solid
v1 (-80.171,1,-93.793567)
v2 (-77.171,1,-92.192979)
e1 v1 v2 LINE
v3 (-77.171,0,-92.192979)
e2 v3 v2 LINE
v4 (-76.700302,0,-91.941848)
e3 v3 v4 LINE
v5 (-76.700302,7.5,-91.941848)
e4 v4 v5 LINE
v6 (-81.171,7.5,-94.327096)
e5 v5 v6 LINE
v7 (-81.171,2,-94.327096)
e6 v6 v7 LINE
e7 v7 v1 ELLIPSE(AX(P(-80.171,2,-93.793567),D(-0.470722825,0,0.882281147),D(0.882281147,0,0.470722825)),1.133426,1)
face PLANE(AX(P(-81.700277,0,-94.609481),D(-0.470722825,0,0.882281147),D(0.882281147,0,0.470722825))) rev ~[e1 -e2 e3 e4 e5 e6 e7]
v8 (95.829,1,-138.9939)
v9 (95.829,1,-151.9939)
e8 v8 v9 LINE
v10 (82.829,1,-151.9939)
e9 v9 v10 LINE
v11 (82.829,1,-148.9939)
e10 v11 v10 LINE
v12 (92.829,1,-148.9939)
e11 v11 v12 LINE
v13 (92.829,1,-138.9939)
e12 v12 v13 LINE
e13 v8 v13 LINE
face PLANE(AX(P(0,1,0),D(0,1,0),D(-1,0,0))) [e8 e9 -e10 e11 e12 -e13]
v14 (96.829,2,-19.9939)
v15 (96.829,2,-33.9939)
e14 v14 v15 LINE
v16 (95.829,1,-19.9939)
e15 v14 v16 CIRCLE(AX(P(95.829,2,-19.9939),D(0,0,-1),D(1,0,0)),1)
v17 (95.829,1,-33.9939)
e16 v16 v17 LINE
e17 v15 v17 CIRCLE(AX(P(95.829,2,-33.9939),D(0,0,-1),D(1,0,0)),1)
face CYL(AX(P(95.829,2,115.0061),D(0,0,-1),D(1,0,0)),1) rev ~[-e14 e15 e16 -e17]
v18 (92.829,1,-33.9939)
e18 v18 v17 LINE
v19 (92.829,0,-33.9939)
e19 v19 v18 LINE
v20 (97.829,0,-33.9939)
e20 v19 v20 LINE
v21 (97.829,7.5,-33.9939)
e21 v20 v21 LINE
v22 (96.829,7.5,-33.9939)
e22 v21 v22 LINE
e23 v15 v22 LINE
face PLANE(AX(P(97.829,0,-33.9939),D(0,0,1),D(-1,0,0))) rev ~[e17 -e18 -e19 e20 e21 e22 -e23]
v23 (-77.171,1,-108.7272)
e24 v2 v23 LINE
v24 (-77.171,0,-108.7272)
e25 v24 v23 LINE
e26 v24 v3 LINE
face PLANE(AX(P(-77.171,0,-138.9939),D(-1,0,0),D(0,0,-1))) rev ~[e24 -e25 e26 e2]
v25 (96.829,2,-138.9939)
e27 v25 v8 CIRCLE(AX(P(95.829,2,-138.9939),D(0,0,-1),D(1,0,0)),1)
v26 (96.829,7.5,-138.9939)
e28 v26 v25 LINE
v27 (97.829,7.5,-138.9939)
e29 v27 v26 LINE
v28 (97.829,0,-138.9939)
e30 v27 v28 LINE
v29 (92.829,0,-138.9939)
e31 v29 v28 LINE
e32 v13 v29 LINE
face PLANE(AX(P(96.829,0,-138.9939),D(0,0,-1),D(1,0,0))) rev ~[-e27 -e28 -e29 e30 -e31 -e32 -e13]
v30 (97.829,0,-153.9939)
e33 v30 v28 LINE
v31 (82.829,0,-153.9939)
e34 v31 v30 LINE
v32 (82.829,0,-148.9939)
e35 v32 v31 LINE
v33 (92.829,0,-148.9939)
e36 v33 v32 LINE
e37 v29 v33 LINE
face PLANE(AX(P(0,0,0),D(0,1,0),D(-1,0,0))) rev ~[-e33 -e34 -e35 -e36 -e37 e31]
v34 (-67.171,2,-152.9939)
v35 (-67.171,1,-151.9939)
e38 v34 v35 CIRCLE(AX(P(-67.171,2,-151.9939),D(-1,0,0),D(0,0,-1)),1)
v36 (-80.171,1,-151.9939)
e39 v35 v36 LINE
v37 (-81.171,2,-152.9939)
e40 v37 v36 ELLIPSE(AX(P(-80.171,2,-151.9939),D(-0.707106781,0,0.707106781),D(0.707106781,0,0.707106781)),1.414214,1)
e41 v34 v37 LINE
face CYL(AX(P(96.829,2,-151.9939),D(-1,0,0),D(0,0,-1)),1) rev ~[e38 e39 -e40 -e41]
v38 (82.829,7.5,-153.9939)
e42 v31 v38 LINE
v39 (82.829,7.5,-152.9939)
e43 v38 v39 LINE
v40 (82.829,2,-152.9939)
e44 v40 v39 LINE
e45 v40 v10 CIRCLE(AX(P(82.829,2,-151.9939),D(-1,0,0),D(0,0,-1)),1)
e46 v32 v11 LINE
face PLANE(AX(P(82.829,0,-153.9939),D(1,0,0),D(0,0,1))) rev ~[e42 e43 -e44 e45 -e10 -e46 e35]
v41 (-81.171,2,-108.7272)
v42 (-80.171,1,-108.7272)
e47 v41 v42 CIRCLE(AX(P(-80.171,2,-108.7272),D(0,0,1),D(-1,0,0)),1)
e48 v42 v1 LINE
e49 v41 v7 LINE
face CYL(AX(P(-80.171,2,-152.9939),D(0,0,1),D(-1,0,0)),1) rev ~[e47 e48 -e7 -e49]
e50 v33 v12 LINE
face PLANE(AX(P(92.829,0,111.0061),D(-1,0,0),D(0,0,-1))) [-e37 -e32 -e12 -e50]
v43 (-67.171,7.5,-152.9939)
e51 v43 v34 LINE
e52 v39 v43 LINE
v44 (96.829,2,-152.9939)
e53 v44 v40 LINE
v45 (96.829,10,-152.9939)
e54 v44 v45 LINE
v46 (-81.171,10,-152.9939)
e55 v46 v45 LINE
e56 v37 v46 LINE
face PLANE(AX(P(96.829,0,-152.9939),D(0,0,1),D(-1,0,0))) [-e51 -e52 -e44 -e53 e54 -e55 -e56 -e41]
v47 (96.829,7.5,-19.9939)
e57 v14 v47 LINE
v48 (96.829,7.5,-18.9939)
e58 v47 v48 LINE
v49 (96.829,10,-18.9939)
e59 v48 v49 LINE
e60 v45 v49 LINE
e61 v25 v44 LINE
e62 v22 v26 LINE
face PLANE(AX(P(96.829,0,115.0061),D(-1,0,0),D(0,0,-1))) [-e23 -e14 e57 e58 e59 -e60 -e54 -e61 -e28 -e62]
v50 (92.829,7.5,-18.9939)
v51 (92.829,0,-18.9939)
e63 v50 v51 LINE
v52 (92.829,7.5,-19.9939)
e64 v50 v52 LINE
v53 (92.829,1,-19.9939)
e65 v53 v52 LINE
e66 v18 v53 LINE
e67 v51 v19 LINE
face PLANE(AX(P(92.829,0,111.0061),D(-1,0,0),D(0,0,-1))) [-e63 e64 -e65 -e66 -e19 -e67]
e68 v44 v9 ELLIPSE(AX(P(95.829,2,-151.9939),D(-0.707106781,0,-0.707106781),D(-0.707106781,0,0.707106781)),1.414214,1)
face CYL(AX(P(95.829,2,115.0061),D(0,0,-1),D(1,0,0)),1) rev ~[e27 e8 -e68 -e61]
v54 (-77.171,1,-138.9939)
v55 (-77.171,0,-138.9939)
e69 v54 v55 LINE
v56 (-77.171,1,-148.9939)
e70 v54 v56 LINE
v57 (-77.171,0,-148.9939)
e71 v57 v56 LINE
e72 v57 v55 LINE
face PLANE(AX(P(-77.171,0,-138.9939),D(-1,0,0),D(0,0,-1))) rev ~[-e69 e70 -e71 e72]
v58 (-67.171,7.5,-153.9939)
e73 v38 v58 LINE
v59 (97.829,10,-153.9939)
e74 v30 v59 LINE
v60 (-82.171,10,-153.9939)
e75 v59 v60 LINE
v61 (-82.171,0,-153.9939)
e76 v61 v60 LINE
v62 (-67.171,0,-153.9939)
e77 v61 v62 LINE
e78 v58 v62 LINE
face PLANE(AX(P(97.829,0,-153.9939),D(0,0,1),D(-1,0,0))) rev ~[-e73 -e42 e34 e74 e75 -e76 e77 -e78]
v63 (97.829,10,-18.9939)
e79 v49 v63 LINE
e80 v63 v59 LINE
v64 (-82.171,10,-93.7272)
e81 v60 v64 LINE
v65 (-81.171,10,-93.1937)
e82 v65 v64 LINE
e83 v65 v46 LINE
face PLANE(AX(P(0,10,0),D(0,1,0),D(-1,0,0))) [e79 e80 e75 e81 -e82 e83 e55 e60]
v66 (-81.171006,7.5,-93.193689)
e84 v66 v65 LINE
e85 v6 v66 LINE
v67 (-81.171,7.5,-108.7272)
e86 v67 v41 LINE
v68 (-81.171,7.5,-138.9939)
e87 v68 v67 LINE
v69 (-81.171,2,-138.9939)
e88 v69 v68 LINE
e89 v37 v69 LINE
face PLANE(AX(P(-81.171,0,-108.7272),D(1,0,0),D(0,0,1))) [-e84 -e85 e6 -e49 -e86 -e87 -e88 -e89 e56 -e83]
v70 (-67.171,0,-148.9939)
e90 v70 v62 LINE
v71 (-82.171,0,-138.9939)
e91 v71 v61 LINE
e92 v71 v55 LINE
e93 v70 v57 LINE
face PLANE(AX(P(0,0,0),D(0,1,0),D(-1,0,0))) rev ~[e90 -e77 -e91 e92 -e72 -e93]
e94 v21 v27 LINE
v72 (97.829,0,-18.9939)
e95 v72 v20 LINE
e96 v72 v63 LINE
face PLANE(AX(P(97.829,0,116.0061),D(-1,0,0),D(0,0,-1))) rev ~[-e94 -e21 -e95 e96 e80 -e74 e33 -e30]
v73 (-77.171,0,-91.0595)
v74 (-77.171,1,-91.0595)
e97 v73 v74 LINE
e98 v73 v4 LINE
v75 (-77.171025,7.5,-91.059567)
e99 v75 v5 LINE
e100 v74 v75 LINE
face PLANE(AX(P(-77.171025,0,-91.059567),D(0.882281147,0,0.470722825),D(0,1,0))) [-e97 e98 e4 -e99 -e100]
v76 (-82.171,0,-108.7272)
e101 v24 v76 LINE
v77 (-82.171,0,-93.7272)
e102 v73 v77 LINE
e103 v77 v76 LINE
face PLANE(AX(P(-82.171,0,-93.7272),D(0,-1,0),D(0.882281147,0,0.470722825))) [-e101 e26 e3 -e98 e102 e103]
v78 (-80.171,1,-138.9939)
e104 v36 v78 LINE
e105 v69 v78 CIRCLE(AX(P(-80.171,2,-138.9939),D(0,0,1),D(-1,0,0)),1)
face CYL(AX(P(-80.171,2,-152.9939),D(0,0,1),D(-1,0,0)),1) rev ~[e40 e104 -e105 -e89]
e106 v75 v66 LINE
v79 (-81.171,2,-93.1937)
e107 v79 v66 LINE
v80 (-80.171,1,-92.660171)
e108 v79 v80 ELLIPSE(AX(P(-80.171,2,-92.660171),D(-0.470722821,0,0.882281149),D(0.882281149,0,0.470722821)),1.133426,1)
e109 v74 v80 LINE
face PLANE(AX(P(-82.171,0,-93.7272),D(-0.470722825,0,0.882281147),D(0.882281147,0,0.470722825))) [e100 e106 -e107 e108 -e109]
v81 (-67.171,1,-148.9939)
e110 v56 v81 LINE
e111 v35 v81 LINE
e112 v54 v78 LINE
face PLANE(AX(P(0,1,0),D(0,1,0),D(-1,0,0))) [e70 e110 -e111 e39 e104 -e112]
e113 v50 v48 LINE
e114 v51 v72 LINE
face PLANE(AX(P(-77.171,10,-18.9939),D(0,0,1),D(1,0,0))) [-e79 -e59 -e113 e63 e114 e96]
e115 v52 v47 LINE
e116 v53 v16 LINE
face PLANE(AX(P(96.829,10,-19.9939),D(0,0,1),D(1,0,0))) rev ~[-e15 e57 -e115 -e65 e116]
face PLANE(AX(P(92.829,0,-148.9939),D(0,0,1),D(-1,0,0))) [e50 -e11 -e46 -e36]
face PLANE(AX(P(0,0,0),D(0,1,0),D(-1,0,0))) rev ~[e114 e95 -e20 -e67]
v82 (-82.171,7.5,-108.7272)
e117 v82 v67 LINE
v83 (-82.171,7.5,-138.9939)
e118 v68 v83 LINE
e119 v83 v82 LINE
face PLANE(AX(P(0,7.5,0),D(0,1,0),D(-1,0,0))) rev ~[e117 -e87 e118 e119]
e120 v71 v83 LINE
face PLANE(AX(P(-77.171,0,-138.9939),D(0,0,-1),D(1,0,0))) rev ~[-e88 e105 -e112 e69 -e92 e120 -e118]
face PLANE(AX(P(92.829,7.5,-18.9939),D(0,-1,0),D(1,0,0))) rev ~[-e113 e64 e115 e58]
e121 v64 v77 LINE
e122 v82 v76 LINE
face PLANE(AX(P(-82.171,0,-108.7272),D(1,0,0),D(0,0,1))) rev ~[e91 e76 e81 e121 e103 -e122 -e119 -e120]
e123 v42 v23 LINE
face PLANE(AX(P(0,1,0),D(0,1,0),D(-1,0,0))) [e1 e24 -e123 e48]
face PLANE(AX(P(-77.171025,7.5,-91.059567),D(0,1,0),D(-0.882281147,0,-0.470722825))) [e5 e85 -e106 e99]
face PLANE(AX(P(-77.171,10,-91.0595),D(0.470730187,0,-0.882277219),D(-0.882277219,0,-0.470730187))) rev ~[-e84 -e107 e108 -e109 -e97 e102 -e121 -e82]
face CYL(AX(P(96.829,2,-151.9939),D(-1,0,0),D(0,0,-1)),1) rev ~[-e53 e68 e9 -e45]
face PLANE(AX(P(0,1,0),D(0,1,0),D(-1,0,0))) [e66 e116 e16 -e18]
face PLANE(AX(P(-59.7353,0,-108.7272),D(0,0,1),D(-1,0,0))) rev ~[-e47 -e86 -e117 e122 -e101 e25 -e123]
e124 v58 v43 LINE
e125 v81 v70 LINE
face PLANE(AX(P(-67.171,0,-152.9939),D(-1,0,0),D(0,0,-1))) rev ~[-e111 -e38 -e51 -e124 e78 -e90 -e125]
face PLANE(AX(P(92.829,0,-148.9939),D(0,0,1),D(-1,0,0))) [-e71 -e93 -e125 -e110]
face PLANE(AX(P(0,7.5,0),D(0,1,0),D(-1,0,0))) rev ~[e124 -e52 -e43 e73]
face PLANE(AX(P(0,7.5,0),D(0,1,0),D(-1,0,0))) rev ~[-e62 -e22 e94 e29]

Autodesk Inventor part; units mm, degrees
ref_plane "YZ Plane" through (0, 0, 0) normal (1, 0, 0) x (0, 1, 0)
ref_plane "XZ Plane" through (0, 0, 0) normal (0, 1, 0) x (-1, 0, 0)
ref_plane "XY Plane" through (0, 0, 0) normal (0, 0, 1) x (1, 0, 0)
sketch "Sketch1" plane through (0, 0, 0) normal (0, 1, 0) x (-1, 0, 0)
  line L0 (82.171, 116.0061) -> (-97.829, 116.0061)
  line L1 (-97.829, 116.0061) -> (-97.829, -153.9939)
  line L2 (-97.829, -153.9939) -> (82.171, -153.9939)
  line L3 (81.171, 115.0061) -> (-96.829, 115.0061)
  line L4 (-96.829, 115.0061) -> (-96.829, -152.9939)
  line L5 (-96.829, -152.9939) -> (81.171, -152.9939)
  line L6 (81.171, 56.2728) -> (81.171, 115.0061)
  line L7 (82.171, -153.9939) -> (82.171, -93.7272)
  line L8 (82.171, 55.7393) -> (82.171, 116.0061)
  line L9 (81.171, -152.9939) -> (81.171, -94.2607)
  line L10 (-92.829, 111.0061) -> (77.171, 111.0061)
  line L11 (-92.829, 111.0061) -> (-92.829, -148.9939)
  line L12 (-92.829, -148.9939) -> (77.171, -148.9939)
  line L13 (77.171, 111.0061) -> (77.171, 58.4069)
  line L14 (77.171, -96.3948) -> (77.171, -148.9939)
  line L15 (67.171, 133.2815) -> (-82.829, 133.2815)
  line L16 (-82.829, 133.2815) -> (-82.829, 85.6394)
  line L17 (-82.829, 85.6394) -> (67.171, 85.6394)
  line L18 (67.171, 85.6394) -> (67.171, 133.2815)
  line L19 (91.8793, 101.0061) -> (59.7353, 101.0061)
  line L20 (59.7353, 101.0061) -> (59.7353, 70.7393)
  line L21 (59.7353, 70.7393) -> (91.8793, 70.7393)
  line L22 (91.8793, 70.7393) -> (91.8793, 101.0061)
  line L23 (-88.3298, 101.0061) -> (-103.1355, 101.0061)
  line L24 (-103.1355, 101.0061) -> (-103.1355, -3.9939)
  line L25 (-103.1355, -3.9939) -> (-88.3298, -3.9939)
  line L26 (-88.3298, -3.9939) -> (-88.3298, 101.0061)
  line L27 (67.171, -171.2694) -> (-82.829, -171.2694)
  line L28 (-82.829, -171.2694) -> (-82.829, -123.6273)
  line L29 (-82.829, -123.6273) -> (67.171, -123.6273)
  line L30 (67.171, -123.6273) -> (67.171, -171.2694)
  line L31 (91.8793, -138.9939) -> (59.7353, -138.9939)
  line L32 (59.7353, -138.9939) -> (59.7353, -108.7272)
  line L33 (59.7353, -108.7272) -> (91.8793, -108.7272)
  line L34 (91.8793, -108.7272) -> (91.8793, -138.9939)
  line L35 (-88.3298, -138.9939) -> (-103.1355, -138.9939)
  line L36 (-103.1355, -138.9939) -> (-103.1355, -33.9939)
  line L37 (-103.1355, -33.9939) -> (-88.3298, -33.9939)
  line L38 (-88.3298, -33.9939) -> (-88.3298, -138.9939)
  line L39 (82.171, 55.7393) -> (171.671, -4.2607)
  line L40 (82.171, -93.7272) -> (171.671, -33.7272)
  line L41 (171.671, -4.2607) -> (171.671, -33.7272)
  line L42 (90.3045, 40.9341) -> (157.1017, -3.8462)
  line L43 (107.5303, 66.6293) -> (174.3275, 21.8491)
  line L44 (107.5303, 66.6293) -> (90.3045, 40.9341)
  line L45 (174.3275, 21.8491) -> (157.1017, -3.8462)
  line L46 (174.3275, -59.837) -> (157.1017, -34.1417)
  line L47 (107.5303, -104.6172) -> (174.3275, -59.837)
  line L48 (90.3045, -78.922) -> (157.1017, -34.1417)
  line L49 (107.5303, -104.6172) -> (90.3045, -78.922)
  line L50 (170.671, -4.7942) -> (170.671, -33.1937)
  line L51 (166.671, -6.9284) -> (166.671, -31.0595)
  line L52 (166.671, -6.9284) -> (77.171, 53.0716)
  line L53 (81.171, 56.2728) -> (81.171, 55.2058)
  line L54 (77.171, 58.4069) -> (77.171, 53.0716)
  line L55 (170.671, -4.7942) -> (81.171, 55.2058)
  line L56 (35.7741, 85.6394) -> (35.6306, 85.7356)
  line L57 (166.671, -31.0595) -> (77.171, -91.0595)
  line L58 (81.171, -94.2607) -> (81.171, -93.1937)
  line L59 (77.171, -96.3948) -> (77.171, -91.0595)
  line L60 (170.671, -33.1937) -> (81.171, -93.1937)
  dimension "d0" = 270
  dimension "d3" = 1
  dimension "d4" = 1
  dimension "d5" = 1
  dimension "d17" = 5
  dimension "d30" = 5
  dimension "d31" = 1
  dimension "d32" = 15
  dimension "d33" = 15
  dimension "d34" = 15
  dimension "d35" = 15
  dimension "d38" = 15
extrude "Extrusion1" add sketch "Sketch1" along normal blind 10 contours L8 L19 L6 L3 L18 L0 | L18 L3 L16 L0 | L8 L21 L6 L19 | L16 L3 L4 L23 L1 L0 | L8 L39 L44 L55 L53 L6 L21 | L23 L4 L25 L1 | L39 L45 L55 L44 | L25 L4 L37 L1 | L39 L41 L40 L46 L60 L50 L55 L45 | L37 L4 L35 L1 | L35 L4 L5 L28 L2 L1 | L40 L49 L60 L46 | L28 L5 L30 L2 | L40 L7 L33 L9 L58 L60 L49 | L30 L5 L9 L31 L7 L2 | L7 L31 L9 L33
extrude "Extrusion2" add sketch "Sketch1" along normal blind 1 contours L18 L10 L16 L3 | L3 L6 L19 L13 L10 L18 | L6 L21 L13 L19 | L16 L10 L11 L23 L4 L3 | L6 L53 L55 L44 L52 L54 L13 L21 | L23 L11 L25 L4 | L55 L45 L52 L44 | L25 L11 L37 L4 | L55 L50 L60 L46 L57 L51 L52 L45 | L37 L11 L35 L4 | L35 L11 L12 L28 L5 L4 | L60 L49 L57 L46 | L28 L12 L30 L5 | L60 L58 L9 L33 L14 L59 L57 L49 | L30 L12 L14 L31 L9 L5 | L9 L31 L14 L33
fillet "Fillet1" radius 1 8 edges at (-81.171, 1, -123.0938) (7.829, 1, -152.9939) (-81.171, 1, 85.1059) (7.829, 1, 115.0061) (96.829, 1, -18.9939) (-125.921, 1, -63.1937) (-170.671, 1, -18.9939) (-125.921, 1, 25.2058)
extrude "Extrusion5" cut sketch "Sketch1" along normal blind 7.5 contours L18 L3 L16 L0 | L0 L16 L15 L18 | L19 L22 L21 L8 | L8 L21 L6 L19 | L18 L10 L16 L3 | L6 L21 L13 L19 | L18 L19 L20 L17 L16 L10 | L13 L21 L20 L17 L18 L19 | L23 L4 L25 L1 | L1 L25 L24 L23 | L18 L17 L20 L19 | L44 L43 L45 L39 | L39 L45 L55 L44 | L23 L11 L25 L4 | L55 L45 L52 L44 | L37 L4 L35 L1 | L1 L35 L36 L37 | L23 L26 L25 L11 | L52 L45 L42 L44 | L37 L11 L35 L4 | L37 L38 L35 L11 | L46 L47 L49 L40 | L40 L49 L60 L46 | L28 L5 L30 L2 | L2 L30 L27 L28 | L60 L49 L57 L46 | L28 L12 L30 L5 | L57 L49 L48 L46 | L28 L29 L32 L31 L30 L12 | L33 L34 L31 L7 | L7 L31 L9 L33 | L9 L31 L14 L33 | L31 L32 L29 L30 | L30 L29 L32 L33 L14 L31
sketch "Sketch3" plane through (0, 10, 0) normal (0, 1, 0) x (1, 0, 0)
  line L0 (-77.171, -53.0716) -> (-77.171, 91.0595)
  line L1 (-77.171, 91.0595) -> (-82.171, 93.7272)
  line L2 (-82.171, 93.7272) -> (-237.6798, 93.7272)
  line L3 (-237.6798, 93.7272) -> (-237.6798, -55.7393)
  line L4 (-80.171, -70.7393) -> (-80.171, -54.6722) projected
  line L5 (-77.171, -53.0716) -> (-82.171, -55.7393)
  line L6 (-82.171, -55.7393) -> (-237.6798, -55.7393)
  line L7 (-77.171, 18.9939) -> (139.9462, 18.9939)
  line L8 (139.9462, 18.9939) -> (139.9462, 278.7318)
  line L9 (139.9462, 278.7318) -> (-77.171, 278.7318)
  line L10 (-126.7833, 93.7272) -> (-77.171, 278.7318)
  point P0 (0, 0)
  point P1 (-81.171, -55.2058)
extrude "Extrusion9" cut sketch "Sketch3" against normal blind 100 contours L0 L1 L2 L10 L9 L8 L7 keep common part
sketch "Sketch6" plane through (96.829, 10, -18.9939) normal (0, 0, 1) x (1, 0, 0)
  line L0 (1, -10) -> (-4, -10)
  line L1 (-4, -10) -> (-4, -2.5)
  line L2 (-4, -2.5) -> (1, -2.5)
  line L3 (1, -2.5) -> (1, -10)
  point P0 (-96.829, -10)
  dimension "d68" = 7.5
  dimension "d69" = 5
extrude "Extrusion10" add sketch "Sketch6" against normal blind 1
sketch "Sketch7" plane through (-82.171, 0, -93.7272) normal (-0.4707228, 0, 0.8822811) x (0.8822811, 0, 0.4707228)
  line L0 (117.2074, 7.5) -> (-15.1347, 7.5) projected
  line L1 (0, 0) -> (5.6671, 0)
  line L2 (5.6671, 0) -> (5.6671, 7.5)
  line L3 (5.6671, 7.5) -> (0, 7.5)
  line L4 (0, 7.5) -> (0, 0)
  point P0 (116.6174, 0)
extrude "Extrusion11" add sketch "Sketch7" against normal blind 1
properties part number "male"
